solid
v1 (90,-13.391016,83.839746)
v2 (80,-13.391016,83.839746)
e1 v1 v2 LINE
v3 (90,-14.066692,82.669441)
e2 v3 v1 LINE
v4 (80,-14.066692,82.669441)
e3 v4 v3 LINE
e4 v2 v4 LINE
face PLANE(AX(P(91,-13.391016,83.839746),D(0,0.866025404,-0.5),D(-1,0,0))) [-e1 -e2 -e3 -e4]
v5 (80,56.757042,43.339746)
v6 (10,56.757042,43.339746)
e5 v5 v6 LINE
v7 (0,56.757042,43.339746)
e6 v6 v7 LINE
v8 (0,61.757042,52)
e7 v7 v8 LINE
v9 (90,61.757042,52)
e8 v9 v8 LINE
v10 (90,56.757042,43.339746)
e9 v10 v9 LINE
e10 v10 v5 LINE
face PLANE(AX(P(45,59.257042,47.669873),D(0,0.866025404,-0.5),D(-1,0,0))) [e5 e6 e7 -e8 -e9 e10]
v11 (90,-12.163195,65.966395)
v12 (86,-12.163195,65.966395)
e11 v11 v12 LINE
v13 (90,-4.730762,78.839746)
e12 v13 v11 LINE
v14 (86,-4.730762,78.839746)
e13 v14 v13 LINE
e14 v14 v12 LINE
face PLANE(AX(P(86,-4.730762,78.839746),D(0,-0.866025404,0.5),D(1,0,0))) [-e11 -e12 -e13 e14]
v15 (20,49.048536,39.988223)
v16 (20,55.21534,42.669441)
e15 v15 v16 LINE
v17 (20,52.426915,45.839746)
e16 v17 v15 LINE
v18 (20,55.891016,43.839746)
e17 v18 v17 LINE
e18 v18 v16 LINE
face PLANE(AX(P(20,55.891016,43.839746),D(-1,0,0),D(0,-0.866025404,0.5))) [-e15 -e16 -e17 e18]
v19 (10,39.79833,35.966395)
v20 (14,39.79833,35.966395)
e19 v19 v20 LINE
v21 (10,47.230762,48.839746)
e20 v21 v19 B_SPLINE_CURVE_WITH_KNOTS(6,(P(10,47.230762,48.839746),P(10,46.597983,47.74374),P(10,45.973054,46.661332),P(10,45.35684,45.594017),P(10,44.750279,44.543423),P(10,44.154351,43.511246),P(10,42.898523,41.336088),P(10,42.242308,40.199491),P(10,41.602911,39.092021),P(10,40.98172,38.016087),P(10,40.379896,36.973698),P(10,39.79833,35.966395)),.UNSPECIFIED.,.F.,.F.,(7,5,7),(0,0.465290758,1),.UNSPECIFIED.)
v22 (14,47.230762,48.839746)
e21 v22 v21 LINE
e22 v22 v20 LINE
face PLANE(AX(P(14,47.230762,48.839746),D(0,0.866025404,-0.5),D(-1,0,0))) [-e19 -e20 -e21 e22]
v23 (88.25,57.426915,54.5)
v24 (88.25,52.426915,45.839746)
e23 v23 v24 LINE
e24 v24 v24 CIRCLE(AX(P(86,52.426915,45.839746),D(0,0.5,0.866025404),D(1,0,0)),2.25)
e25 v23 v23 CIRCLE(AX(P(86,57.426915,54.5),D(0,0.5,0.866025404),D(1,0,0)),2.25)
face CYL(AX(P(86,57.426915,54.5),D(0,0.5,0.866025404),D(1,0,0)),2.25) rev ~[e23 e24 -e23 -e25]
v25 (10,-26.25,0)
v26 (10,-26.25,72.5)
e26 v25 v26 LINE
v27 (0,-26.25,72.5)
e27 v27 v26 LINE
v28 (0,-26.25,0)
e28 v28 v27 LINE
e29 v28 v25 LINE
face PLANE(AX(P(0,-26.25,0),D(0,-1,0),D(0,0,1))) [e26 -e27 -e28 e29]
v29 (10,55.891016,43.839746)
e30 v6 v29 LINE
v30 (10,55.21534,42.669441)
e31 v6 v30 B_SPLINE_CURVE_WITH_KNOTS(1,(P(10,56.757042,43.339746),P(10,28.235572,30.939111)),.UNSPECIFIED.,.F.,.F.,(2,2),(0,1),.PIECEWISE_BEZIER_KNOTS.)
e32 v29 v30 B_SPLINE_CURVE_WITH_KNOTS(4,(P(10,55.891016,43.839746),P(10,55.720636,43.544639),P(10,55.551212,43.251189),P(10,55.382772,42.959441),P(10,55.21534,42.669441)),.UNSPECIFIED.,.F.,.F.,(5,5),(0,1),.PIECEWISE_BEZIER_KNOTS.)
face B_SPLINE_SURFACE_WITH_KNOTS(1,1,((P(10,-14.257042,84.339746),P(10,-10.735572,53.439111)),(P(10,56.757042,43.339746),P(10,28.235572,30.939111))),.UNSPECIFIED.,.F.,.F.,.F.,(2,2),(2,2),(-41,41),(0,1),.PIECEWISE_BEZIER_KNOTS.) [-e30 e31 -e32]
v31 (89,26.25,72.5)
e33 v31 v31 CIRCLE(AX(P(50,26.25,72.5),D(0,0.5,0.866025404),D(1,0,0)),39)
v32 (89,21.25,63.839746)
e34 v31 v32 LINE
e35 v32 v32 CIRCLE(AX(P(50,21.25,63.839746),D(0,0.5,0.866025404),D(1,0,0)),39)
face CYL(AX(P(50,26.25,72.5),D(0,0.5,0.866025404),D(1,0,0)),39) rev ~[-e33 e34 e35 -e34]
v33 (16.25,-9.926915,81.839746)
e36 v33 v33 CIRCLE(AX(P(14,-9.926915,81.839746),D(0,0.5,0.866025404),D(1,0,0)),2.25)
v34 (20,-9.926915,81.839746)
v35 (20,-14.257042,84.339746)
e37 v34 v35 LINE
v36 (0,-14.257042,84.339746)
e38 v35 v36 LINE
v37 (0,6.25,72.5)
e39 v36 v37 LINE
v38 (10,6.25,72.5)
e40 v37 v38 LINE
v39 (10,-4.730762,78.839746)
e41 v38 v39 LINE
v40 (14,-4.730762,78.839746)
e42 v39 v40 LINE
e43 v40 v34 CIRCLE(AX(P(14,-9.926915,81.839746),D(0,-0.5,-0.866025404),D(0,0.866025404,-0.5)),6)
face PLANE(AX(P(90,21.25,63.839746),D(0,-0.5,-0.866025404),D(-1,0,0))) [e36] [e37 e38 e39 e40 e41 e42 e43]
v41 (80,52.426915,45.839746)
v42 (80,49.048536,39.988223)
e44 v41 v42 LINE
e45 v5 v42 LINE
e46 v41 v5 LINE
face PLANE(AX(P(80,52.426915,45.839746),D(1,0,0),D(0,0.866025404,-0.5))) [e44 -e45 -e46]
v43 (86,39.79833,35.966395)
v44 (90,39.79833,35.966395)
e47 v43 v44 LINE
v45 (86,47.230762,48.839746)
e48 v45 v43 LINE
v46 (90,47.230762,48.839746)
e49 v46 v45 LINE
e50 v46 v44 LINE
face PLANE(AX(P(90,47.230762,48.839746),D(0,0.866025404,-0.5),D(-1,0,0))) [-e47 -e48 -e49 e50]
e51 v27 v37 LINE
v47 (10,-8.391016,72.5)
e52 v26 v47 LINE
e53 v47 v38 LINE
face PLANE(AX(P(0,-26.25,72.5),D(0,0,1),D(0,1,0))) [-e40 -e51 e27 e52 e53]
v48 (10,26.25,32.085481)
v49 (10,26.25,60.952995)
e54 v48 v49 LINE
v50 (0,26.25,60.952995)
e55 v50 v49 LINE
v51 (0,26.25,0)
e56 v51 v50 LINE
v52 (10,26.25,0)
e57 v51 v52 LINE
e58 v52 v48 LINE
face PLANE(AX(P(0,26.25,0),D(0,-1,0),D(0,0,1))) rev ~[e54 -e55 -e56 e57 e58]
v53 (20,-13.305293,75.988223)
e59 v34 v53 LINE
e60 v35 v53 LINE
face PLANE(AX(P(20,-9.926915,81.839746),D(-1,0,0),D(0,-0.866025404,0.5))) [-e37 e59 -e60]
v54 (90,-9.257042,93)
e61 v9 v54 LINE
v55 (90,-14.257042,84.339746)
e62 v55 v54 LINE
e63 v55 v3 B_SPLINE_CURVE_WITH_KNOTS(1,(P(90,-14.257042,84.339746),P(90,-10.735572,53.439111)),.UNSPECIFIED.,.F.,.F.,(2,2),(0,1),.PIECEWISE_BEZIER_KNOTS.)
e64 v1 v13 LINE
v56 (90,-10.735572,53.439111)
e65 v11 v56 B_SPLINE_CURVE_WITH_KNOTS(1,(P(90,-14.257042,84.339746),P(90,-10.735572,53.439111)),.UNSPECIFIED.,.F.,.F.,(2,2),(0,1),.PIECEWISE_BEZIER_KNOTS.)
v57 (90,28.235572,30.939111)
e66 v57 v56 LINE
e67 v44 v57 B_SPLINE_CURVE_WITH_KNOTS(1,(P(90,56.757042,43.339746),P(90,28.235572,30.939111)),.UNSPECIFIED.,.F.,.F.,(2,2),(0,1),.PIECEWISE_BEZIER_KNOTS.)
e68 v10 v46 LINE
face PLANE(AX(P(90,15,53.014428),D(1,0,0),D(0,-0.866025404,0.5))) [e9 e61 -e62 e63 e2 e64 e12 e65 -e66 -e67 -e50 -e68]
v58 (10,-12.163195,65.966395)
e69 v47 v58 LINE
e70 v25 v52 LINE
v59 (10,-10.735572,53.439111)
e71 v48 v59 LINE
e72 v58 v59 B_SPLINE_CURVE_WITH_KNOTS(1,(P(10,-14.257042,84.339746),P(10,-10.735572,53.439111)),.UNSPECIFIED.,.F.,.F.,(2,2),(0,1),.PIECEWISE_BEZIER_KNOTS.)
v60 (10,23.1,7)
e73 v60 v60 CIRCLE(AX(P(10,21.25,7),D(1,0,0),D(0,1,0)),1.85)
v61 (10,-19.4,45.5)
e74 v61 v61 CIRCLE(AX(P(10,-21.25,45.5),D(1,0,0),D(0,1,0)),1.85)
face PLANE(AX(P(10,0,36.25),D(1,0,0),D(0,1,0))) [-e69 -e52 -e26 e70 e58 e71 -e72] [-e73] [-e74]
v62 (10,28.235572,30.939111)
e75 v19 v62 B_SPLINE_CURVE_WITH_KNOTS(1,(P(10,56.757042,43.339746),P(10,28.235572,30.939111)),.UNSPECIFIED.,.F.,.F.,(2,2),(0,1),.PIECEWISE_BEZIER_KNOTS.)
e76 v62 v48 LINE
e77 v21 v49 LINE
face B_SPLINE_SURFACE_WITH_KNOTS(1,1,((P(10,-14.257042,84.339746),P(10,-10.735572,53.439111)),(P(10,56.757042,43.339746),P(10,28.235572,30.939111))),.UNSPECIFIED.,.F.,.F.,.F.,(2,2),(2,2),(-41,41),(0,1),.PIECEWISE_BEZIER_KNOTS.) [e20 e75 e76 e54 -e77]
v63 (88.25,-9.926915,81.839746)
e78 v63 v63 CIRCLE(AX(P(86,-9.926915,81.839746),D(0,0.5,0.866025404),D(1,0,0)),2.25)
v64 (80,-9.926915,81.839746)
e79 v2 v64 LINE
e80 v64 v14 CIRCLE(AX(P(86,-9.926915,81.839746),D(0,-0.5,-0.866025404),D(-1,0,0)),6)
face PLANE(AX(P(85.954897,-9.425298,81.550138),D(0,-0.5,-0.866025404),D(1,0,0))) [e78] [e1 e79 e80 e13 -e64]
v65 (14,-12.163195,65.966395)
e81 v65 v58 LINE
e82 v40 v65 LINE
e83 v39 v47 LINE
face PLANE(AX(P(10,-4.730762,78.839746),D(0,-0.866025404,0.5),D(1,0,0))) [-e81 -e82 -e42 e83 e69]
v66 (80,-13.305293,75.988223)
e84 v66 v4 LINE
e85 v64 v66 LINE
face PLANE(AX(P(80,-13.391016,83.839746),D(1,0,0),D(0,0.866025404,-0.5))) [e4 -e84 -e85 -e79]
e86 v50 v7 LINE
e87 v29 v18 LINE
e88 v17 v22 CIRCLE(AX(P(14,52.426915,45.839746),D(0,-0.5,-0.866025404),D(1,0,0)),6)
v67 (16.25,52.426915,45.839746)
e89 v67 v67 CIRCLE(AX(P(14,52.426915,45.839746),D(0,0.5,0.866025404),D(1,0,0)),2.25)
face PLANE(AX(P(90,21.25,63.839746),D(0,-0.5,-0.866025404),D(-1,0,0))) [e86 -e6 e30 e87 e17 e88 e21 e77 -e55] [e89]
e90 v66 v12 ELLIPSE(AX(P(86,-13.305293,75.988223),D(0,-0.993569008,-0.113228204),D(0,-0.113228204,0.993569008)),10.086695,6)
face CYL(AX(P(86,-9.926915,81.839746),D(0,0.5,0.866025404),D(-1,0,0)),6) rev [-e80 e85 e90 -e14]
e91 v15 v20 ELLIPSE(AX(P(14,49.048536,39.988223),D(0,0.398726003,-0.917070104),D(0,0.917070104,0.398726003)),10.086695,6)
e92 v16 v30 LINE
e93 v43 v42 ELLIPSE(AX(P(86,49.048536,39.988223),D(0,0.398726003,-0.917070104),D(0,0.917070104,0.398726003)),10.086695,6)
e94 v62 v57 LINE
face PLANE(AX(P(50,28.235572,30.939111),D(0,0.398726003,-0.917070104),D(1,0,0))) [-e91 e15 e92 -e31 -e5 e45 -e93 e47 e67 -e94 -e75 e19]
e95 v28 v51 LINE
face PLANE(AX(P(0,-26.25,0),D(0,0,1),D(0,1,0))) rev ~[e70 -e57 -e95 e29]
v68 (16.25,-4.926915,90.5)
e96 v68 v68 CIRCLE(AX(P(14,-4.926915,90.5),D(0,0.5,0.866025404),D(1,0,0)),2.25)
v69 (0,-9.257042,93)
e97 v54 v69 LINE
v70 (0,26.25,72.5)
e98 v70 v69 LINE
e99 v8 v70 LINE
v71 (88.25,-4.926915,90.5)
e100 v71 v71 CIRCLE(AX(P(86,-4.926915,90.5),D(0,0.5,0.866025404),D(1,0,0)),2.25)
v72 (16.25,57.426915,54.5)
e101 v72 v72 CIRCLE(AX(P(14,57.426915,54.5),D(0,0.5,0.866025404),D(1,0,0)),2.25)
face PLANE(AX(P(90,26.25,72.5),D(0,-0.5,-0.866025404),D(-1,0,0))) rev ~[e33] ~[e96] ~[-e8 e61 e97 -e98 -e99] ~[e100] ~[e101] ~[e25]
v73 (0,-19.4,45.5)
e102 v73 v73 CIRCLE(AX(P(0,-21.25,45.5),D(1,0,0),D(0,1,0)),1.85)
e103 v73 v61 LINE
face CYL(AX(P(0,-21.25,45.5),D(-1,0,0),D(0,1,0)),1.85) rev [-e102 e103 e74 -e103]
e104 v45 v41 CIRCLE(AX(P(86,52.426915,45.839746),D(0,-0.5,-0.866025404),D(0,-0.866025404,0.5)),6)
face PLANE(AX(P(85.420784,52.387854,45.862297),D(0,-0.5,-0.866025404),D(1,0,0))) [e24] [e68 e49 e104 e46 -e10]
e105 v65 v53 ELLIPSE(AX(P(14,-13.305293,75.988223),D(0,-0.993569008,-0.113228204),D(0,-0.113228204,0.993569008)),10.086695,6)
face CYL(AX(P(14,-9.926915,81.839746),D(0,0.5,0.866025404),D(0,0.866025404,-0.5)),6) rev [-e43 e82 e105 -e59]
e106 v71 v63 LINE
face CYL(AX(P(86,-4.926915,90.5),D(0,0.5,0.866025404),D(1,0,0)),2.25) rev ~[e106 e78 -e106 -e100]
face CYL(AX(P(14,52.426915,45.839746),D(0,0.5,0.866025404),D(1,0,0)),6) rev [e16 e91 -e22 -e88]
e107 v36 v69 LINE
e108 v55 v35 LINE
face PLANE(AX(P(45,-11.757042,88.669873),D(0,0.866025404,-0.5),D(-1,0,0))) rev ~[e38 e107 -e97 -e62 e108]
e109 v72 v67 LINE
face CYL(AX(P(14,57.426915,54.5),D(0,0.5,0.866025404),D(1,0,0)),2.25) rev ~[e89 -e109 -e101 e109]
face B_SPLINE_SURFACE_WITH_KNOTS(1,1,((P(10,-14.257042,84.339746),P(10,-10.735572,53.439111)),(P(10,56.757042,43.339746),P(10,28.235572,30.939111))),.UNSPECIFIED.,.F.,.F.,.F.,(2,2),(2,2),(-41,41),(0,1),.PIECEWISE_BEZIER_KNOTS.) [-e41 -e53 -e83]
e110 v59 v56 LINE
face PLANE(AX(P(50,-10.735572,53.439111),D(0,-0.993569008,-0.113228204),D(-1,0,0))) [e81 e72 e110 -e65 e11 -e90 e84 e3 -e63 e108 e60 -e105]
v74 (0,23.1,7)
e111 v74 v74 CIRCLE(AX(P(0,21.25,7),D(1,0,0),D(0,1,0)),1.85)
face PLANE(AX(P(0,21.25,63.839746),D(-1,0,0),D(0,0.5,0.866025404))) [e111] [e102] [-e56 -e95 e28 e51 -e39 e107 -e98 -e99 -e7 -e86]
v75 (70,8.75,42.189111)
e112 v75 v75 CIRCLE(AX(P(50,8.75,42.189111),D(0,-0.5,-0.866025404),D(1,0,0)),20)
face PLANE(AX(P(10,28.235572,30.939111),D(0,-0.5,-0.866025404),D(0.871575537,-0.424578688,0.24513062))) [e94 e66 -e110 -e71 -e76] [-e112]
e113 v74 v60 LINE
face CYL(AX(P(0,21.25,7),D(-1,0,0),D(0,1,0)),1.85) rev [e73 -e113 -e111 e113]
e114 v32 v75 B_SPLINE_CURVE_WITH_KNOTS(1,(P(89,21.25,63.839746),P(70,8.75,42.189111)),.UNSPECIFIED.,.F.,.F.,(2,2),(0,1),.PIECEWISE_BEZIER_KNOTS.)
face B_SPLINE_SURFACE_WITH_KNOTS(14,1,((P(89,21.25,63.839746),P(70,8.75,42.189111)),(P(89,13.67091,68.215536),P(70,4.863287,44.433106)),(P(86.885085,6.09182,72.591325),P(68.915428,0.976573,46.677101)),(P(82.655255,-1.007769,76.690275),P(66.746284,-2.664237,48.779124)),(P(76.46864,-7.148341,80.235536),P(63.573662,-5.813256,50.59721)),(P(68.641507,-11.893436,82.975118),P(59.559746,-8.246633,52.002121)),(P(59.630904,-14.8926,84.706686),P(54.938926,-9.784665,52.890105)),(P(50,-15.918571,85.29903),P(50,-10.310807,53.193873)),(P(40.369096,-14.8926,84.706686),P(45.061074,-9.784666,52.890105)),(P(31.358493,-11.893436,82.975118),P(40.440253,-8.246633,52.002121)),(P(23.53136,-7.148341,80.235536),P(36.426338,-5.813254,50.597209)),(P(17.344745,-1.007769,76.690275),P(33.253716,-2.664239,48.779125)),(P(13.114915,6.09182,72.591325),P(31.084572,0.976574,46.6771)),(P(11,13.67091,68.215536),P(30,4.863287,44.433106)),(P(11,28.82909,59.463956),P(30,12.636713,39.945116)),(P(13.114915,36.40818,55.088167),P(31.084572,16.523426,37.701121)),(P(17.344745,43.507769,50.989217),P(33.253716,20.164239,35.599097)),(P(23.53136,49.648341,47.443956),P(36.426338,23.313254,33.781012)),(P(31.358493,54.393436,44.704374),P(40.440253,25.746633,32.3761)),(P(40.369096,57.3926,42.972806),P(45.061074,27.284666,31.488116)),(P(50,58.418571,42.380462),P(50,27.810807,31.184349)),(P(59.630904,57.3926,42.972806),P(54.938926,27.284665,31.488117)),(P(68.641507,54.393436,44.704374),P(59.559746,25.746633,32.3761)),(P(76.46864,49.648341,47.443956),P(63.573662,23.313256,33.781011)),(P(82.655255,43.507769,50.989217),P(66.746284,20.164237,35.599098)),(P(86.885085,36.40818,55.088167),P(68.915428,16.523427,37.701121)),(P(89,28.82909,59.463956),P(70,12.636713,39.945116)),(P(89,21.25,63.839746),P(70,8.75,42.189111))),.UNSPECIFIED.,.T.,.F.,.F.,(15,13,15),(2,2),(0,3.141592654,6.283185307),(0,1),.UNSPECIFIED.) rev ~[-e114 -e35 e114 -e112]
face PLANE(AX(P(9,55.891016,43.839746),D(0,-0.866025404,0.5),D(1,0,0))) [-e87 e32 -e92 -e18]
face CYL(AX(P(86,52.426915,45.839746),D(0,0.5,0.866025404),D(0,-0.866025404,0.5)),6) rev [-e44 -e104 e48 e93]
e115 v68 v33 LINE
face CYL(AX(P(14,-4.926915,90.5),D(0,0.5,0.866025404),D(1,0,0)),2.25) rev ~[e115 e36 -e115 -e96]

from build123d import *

# Parameters (mm, degrees)
F0_W      = 52.5
F0_H      = 72.5
F0_R      = 1.85
F1_DEPTH  = 10
F3_W      = 90
F3_H      = 10
F4_DEPTH  = 41
F5_R      = 2.25
F5_R_2    = 39
F7_DEPTH  = 89.0378417744
F9_W      = 80
F9_H      = 82
F8_W      = 80
F8_H      = 45
F11_R     = 39
F12_R     = 20
F15_DEPTH = 25


with BuildPart() as f1:
    # F0 (on Right) → F1 (new body)
    with BuildSketch(Plane.YZ):
        with Locations((0, 36.25)):
            Rectangle(F0_W, F0_H)
        with Locations((21.25, 7)):
            Circle(F0_R, mode=Mode.SUBTRACT)
        with Locations((-21.25, 45.5)):
            Circle(F0_R, mode=Mode.SUBTRACT)
    extrude(amount=F1_DEPTH)

    # F3 (on face) → F4 (join, symmetric)
    with BuildSketch(Plane(origin=(0, -11.7059208872, 6.7584165753), x_dir=(-1, 0, 0), z_dir=(0, 0.8660254038, -0.5))):
        with Locations((-45, 70.9118417744)):
            Rectangle(F3_W, F3_H)
    extrude(amount=F4_DEPTH, both=True)

    # F5 (on face) → F7 (cut, through all)
    with BuildSketch(Plane(origin=(0, 37.9559208872, 65.7415834247), x_dir=(1, 0, 0), z_dir=(0, 0.5, 0.8660254038))):
        with Locations((14, -49.5168331507)):
            Circle(F5_R)
        with Locations((86, -49.5168331507)):
            Circle(F5_R)
        with Locations((86, 22.4831668493)):
            Circle(F5_R)
        with Locations((14, 22.4831668493)):
            Circle(F5_R)
        with Locations((50, -13.5168331507)):
            Circle(F5_R_2)
    extrude(amount=-F7_DEPTH, mode=Mode.SUBTRACT)

    # F9 (on face) → F10 section 0
    with BuildSketch(Plane(origin=(0, 32.9559208872, 57.0813293868), x_dir=(1, 0, 0), z_dir=(0, -0.5, -0.8660254038))):
        with Locations((50, 13.5168331507)):
            Rectangle(F9_W, F9_H)
    # F8 (on offset) → F10 section 1
    with BuildSketch(Plane(origin=(0, 20.4559208872, 35.4306942922), x_dir=(1, 0, 0), z_dir=(0, -0.5, -0.8660254038))):
        with Locations((50, 13.5168331507)):
            Rectangle(F8_W, F8_H)
    loft()

    # F11 (on face) → F13 section 0
    with BuildSketch(Plane(origin=(0, 32.9559208872, 57.0813293868), x_dir=(1, 0, 0), z_dir=(0, -0.5, -0.8660254038))):
        with Locations((50, 13.5168331507)):
            Circle(F11_R)
    # F12 (on face) → F13 section 1
    with BuildSketch(Plane(origin=(0, 20.4559208872, 35.4306942922), x_dir=(1, 0, 0), z_dir=(0, -0.5, -0.8660254038))):
        with Locations((50, 13.5168331507)):
            Circle(F12_R)
    loft(mode=Mode.SUBTRACT)

    # F14 (on face) → F15 (cut, through all)
    with BuildSketch(Plane(origin=(0, 32.9559208872, 57.0813293868), x_dir=(1, 0, 0), z_dir=(0, -0.5, -0.8660254038))):
        with BuildLine():
            Line((10, 43.5168331507), (14, 43.5168331507))
            ThreePointArc((14, 43.5168331507), (18.2426406871, 45.2741924635), (20, 49.5168331507))
            Line((20, 49.5168331507), (20, 54.5168331507))
            Line((20, 54.5168331507), (10, 54.5168331507))
            Line((10, 54.5168331507), (10, 43.5168331507))
        make_face()
        with BuildLine():
            Line((9, -26.4831668493), (20, -26.4831668493))
            Line((20, -26.4831668493), (20, -22.4831668493))
            ThreePointArc((20, -22.4831668493), (18.2426406871, -18.2405261622), (14, -16.4831668493))
            Line((14, -16.4831668493), (9, -16.4831668493))
            Line((9, -16.4831668493), (9, -26.4831668493))
        make_face()
        with BuildLine():
            Line((90, -27.4831668493), (90, -16.4831668493))
            Line((90, -16.4831668493), (86, -16.4831668493))
            ThreePointArc((86, -16.4831668493), (81.7573593129, -18.2405261622), (80, -22.4831668493))
            Line((80, -22.4831668493), (80, -27.4831668493))
            Line((80, -27.4831668493), (90, -27.4831668493))
        make_face()
        with BuildLine():
            Line((91, 53.5168331507), (80, 53.5168331507))
            Line((80, 53.5168331507), (80, 49.5168331507))
            ThreePointArc((80, 49.5168331507), (81.7573593129, 45.2741924635), (86, 43.5168331507))
            Line((86, 43.5168331507), (91, 43.5168331507))
            Line((91, 43.5168331507), (91, 53.5168331507))
        make_face()
    extrude(amount=F15_DEPTH, mode=Mode.SUBTRACT)


solid = f1.part
